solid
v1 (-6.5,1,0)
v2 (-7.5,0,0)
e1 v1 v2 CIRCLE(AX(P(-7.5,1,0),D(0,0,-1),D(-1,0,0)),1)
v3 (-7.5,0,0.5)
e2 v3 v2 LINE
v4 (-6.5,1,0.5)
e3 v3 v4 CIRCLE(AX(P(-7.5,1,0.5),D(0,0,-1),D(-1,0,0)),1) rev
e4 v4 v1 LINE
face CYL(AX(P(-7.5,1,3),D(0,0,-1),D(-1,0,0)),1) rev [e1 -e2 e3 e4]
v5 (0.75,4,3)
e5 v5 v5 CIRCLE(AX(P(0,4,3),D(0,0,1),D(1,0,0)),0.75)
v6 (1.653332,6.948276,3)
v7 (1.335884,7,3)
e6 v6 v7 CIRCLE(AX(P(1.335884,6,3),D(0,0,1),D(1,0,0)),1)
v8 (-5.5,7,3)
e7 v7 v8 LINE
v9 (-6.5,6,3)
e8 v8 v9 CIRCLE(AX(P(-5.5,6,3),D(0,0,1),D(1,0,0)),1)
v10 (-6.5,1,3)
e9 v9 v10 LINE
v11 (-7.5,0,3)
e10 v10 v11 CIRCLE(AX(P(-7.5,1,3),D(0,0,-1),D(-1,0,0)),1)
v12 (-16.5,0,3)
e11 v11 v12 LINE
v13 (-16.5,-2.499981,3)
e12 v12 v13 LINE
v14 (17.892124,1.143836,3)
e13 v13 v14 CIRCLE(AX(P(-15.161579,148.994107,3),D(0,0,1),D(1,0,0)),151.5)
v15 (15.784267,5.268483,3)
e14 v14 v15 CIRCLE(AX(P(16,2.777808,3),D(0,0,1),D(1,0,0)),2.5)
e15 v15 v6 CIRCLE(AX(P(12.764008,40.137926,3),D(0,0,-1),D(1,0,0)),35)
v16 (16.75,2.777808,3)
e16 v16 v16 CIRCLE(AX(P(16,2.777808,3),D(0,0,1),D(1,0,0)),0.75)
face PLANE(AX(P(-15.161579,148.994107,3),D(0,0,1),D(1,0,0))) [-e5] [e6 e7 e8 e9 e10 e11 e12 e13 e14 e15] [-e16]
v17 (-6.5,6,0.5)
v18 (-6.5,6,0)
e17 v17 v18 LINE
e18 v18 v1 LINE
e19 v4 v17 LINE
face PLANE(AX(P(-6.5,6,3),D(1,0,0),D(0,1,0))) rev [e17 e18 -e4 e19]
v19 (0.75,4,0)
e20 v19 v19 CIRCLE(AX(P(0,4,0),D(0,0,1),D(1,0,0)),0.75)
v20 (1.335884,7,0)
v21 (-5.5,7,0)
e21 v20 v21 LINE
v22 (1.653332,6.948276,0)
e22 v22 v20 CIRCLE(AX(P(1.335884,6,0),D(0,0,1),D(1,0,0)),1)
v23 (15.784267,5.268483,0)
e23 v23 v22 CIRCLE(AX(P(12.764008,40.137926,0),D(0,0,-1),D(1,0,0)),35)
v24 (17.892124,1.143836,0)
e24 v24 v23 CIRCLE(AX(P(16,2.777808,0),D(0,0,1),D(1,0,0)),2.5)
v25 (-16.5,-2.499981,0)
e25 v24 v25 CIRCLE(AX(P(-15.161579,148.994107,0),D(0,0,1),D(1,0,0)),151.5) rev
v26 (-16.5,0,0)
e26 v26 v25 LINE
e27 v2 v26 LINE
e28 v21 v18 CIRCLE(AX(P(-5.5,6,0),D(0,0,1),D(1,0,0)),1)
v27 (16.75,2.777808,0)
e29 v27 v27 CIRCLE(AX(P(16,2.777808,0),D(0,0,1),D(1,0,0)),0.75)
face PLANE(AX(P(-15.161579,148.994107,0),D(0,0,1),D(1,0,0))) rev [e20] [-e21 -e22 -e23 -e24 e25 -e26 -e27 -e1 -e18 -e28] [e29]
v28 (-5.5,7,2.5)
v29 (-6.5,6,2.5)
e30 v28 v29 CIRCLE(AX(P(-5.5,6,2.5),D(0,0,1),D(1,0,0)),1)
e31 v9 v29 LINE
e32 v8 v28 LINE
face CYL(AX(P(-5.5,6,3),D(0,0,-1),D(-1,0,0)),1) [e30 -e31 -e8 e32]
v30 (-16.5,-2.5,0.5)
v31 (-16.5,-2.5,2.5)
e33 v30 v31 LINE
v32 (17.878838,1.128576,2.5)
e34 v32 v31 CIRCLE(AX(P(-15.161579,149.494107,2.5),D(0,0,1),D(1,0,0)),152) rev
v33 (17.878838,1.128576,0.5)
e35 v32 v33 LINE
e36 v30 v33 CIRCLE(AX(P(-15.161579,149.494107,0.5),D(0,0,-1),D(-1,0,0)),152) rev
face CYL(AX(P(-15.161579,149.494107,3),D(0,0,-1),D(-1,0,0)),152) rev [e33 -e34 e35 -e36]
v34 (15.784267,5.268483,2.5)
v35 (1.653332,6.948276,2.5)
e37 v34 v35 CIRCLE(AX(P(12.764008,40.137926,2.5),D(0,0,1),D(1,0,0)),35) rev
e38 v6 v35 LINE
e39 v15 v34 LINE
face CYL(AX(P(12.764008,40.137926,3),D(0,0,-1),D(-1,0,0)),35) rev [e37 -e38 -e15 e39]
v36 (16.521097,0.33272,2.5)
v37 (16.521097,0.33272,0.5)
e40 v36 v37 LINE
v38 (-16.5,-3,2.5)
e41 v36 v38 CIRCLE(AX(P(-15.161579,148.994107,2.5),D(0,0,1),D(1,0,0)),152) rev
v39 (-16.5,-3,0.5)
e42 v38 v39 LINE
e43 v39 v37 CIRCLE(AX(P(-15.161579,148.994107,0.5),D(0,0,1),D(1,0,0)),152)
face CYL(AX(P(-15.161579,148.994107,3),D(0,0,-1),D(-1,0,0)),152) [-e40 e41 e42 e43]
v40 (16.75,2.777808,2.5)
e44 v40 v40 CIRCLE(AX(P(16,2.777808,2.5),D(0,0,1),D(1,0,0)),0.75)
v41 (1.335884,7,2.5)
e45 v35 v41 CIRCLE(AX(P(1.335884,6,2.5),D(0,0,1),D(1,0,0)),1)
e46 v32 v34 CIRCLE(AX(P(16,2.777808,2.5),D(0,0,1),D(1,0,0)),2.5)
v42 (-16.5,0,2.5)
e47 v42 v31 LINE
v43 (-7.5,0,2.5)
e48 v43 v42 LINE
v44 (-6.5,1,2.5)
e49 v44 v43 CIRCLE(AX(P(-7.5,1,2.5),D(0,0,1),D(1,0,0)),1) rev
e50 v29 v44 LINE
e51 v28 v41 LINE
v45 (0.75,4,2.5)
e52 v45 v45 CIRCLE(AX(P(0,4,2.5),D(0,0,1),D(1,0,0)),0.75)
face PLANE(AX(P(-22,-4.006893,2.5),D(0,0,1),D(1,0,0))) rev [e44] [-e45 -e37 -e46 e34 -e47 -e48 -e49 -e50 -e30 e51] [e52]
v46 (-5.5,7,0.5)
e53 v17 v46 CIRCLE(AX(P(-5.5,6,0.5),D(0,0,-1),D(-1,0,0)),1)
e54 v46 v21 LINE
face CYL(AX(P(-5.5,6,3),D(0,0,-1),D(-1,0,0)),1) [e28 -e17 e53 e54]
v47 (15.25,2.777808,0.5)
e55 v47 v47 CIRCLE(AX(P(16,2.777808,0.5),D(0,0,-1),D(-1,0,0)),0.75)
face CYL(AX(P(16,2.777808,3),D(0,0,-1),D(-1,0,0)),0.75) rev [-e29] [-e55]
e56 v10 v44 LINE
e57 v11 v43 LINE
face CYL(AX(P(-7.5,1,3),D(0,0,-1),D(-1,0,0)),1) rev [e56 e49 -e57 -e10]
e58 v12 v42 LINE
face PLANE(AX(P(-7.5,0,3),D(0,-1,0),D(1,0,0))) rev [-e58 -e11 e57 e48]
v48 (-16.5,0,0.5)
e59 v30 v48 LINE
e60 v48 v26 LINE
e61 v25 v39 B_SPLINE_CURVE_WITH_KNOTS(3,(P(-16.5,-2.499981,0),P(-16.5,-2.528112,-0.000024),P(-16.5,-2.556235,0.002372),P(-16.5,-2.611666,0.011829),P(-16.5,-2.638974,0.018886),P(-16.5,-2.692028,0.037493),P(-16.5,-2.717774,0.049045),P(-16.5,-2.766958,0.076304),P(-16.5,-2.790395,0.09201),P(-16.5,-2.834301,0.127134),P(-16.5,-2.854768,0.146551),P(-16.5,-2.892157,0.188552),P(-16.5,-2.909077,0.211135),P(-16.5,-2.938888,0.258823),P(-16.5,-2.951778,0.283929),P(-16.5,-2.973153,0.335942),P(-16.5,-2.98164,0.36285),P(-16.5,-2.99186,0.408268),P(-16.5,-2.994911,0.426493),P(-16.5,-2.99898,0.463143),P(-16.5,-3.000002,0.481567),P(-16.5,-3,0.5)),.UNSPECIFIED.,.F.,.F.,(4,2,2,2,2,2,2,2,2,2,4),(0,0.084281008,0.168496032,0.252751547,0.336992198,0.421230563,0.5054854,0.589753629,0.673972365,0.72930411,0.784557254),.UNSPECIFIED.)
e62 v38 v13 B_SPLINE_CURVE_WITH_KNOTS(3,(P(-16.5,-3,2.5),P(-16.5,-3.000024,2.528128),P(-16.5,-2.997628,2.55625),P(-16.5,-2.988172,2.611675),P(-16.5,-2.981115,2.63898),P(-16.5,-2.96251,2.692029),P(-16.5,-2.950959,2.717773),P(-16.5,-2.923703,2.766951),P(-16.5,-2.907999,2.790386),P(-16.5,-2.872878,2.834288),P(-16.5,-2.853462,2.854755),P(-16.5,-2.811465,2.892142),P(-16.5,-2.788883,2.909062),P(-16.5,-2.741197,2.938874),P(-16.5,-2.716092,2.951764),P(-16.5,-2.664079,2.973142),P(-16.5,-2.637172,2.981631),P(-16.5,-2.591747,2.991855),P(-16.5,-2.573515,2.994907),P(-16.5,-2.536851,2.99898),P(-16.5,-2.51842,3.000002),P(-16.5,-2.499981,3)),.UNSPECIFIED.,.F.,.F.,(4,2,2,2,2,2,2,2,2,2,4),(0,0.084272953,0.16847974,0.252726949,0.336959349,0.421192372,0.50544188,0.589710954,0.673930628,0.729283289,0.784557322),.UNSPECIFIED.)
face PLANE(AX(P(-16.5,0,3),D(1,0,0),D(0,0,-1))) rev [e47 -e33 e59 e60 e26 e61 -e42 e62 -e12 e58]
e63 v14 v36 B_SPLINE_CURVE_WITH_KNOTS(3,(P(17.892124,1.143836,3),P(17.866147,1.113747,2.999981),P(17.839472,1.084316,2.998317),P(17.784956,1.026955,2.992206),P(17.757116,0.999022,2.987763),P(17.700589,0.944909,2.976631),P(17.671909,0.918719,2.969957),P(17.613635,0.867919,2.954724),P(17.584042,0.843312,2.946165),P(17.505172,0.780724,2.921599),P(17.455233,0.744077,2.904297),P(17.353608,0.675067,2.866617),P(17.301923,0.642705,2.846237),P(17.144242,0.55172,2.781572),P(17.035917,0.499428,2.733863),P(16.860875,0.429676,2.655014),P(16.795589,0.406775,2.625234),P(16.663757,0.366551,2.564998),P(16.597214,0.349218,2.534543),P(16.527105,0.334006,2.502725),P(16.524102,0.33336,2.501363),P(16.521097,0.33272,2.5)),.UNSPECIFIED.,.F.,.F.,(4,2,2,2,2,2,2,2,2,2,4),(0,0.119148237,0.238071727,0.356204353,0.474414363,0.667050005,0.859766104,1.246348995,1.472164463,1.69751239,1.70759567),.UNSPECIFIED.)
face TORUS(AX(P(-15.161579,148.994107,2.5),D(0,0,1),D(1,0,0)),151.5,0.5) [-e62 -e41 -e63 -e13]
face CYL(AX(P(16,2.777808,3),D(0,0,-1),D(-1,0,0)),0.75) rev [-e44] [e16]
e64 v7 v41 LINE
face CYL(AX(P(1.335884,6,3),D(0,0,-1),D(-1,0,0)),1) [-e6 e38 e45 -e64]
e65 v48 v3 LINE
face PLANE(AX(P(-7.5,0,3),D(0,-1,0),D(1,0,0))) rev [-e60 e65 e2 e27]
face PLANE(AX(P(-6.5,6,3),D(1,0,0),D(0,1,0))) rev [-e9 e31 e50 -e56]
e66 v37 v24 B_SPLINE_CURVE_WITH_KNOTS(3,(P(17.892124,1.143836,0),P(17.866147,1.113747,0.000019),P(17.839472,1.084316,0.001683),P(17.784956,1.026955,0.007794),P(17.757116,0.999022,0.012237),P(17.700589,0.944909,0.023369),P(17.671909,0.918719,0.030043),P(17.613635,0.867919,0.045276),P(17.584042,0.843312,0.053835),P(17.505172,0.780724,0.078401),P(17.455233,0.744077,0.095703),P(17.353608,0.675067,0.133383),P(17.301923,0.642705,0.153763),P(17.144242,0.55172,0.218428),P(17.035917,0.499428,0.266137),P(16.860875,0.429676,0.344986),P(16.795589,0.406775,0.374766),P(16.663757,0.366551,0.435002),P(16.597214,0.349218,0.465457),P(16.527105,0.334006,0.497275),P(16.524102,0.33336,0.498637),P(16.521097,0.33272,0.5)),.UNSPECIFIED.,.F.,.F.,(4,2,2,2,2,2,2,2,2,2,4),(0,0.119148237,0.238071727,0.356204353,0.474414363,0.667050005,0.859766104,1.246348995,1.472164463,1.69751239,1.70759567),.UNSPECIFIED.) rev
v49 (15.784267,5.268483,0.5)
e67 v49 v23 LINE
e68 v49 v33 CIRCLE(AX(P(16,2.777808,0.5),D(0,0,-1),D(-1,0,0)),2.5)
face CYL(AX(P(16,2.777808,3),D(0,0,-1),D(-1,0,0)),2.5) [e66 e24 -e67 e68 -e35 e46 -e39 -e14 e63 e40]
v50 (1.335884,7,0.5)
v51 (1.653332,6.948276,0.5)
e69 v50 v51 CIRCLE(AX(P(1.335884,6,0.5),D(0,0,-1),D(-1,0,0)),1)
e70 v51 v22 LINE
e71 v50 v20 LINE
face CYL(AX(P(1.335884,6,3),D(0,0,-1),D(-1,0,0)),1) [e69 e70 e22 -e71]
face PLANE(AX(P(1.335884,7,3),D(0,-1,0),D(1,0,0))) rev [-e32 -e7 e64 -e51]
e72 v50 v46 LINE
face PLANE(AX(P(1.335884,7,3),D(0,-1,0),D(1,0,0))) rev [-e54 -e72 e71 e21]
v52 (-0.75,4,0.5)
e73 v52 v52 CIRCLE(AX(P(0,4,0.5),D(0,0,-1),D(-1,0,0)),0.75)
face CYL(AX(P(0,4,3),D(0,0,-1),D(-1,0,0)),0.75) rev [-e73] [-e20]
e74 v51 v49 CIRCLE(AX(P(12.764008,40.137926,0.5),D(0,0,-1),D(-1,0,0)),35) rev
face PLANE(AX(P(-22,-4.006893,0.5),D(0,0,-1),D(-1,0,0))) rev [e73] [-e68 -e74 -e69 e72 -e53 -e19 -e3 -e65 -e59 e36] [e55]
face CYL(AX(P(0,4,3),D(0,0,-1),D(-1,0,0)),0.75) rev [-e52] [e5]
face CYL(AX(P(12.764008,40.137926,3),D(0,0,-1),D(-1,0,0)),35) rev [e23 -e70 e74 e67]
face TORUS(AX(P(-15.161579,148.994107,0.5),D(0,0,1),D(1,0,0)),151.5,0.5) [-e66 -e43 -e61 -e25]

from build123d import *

# Parameters (mm, degrees)
SCHIZZO1_R                   = 0.75
ESTRUSIONE_ESTRUSIONE1_DEPTH = 3
TAGLIO_ESTRUSIONE2_START     = 0.5
TAGLIO_ESTRUSIONE2_OUTLINE_R = 0.75
TAGLIO_ESTRUSIONE2_DEPTH     = 2
RACCORDO1_R                  = 0.5


with BuildPart() as part:
    # Schizzo1 → Estrusione-Estrusione1 (new body)
    with BuildSketch(Plane.XY):
        with BuildLine():
            Line((1.335883711, 7), (-5.5, 7))
            ThreePointArc((-5.5, 7), (-6.207106781, 6.707106781), (-6.5, 6))
            Line((-6.5, 6), (-6.5, 1))
            ThreePointArc((-6.5, 1), (-6.792893219, 0.292893219), (-7.5, 0))
            Line((-7.5, 0), (-16.5, 0))
            Line((-16.5, 0), (-16.5, -3))
            ThreePointArc((-16.5, -3), (0.101782453, -2.23760178), (16.521096634, 0.332719886))
            ThreePointArc((16.521096634, 0.332719886), (18.472600065, 3.146927603), (15.784267214, 5.268482974))
            ThreePointArc((15.784267214, 5.268482974), (8.632526621, 5.382625954), (1.653331613, 6.948275714))
            ThreePointArc((1.653331613, 6.948275714), (1.496700822, 6.986984223), (1.335883711, 7))
        make_face()
        with Locations((0, 4)):
            Circle(SCHIZZO1_R, mode=Mode.SUBTRACT)
        with Locations((16, 2.777808494)):
            Circle(SCHIZZO1_R, mode=Mode.SUBTRACT)
    extrude(amount=ESTRUSIONE_ESTRUSIONE1_DEPTH)

    # Taglio-Estrusione2: read off the stored shape, not the designer's step
    # Taglio-Estrusione2 outline → Taglio-Estrusione2 (cut)
    with BuildSketch(Plane.XY.offset(TAGLIO_ESTRUSIONE2_START)):
        with BuildLine():
            ThreePointArc((-16.5, -2.5), (0.79291183, -1.666252109), (17.878837946, 1.128575953))
            ThreePointArc((17.878837946, 1.128575953), (18.230736925, 3.906441637), (15.784267214, 5.268482974))
            ThreePointArc((15.784267214, 5.268482974), (8.632526621, 5.382625954), (1.653331613, 6.948275714))
            ThreePointArc((1.653331613, 6.948275714), (1.496700822, 6.986984223), (1.335883711, 7))
            Line((1.335883711, 7), (-5.5, 7))
            ThreePointArc((-5.5, 7), (-6.207106781, 6.707106781), (-6.5, 6))
            Line((-6.5, 6), (-6.5, 1))
            ThreePointArc((-6.5, 1), (-6.792893219, 0.292893219), (-7.5, 0))
            Line((-7.5, 0), (-16.5, 0))
            Line((-16.5, 0), (-16.5, -2.5))
        make_face()
        with Locations((0, 4)):
            Circle(TAGLIO_ESTRUSIONE2_OUTLINE_R, mode=Mode.SUBTRACT)
        with Locations((16, 2.777808494)):
            Circle(TAGLIO_ESTRUSIONE2_OUTLINE_R, mode=Mode.SUBTRACT)
    extrude(amount=TAGLIO_ESTRUSIONE2_DEPTH, mode=Mode.SUBTRACT)

    # Raccordo1
    # the kernel refuses this fillet: 0.5 mm, written as the material it takes off along each edge
    with BuildSketch(Plane(origin=(-15.161578714, 148.994107216, 0), x_dir=(-0.017028442214045383, -0.9998550055661886, 0), z_dir=(-0.9998550055661886, 0.017028442214045383, 0))) as raccordo1_piece_1:
        with BuildLine():
            CenterArc((152 - RACCORDO1_R, RACCORDO1_R), RACCORDO1_R, 270, 90)
            Line((152, RACCORDO1_R), (152, 0))
            Line((152, 0), (152 - RACCORDO1_R, 0))
        make_face()
    revolve(axis=Axis((-15.161578714, 148.994107216, 0), (0, 0, 1)), revolution_arc=13.807590381, mode=Mode.SUBTRACT)
    with BuildSketch(Plane(origin=(-15.161578714, 148.994107216, 3), x_dir=(-0.017028442214045383, -0.9998550055661886, 0), z_dir=(-0.9998550055661886, 0.017028442214045383, 0))) as raccordo1_piece_2:
        with BuildLine():
            CenterArc((152 - RACCORDO1_R, -RACCORDO1_R), RACCORDO1_R, 0, 90)
            Line((152 - RACCORDO1_R, 0), (152, 0))
            Line((152, 0), (152, -RACCORDO1_R))
        make_face()
    revolve(axis=Axis((-15.161578714, 148.994107216, 3), (0, 0, 1)), revolution_arc=13.807590381, mode=Mode.SUBTRACT)


solid = part.part
